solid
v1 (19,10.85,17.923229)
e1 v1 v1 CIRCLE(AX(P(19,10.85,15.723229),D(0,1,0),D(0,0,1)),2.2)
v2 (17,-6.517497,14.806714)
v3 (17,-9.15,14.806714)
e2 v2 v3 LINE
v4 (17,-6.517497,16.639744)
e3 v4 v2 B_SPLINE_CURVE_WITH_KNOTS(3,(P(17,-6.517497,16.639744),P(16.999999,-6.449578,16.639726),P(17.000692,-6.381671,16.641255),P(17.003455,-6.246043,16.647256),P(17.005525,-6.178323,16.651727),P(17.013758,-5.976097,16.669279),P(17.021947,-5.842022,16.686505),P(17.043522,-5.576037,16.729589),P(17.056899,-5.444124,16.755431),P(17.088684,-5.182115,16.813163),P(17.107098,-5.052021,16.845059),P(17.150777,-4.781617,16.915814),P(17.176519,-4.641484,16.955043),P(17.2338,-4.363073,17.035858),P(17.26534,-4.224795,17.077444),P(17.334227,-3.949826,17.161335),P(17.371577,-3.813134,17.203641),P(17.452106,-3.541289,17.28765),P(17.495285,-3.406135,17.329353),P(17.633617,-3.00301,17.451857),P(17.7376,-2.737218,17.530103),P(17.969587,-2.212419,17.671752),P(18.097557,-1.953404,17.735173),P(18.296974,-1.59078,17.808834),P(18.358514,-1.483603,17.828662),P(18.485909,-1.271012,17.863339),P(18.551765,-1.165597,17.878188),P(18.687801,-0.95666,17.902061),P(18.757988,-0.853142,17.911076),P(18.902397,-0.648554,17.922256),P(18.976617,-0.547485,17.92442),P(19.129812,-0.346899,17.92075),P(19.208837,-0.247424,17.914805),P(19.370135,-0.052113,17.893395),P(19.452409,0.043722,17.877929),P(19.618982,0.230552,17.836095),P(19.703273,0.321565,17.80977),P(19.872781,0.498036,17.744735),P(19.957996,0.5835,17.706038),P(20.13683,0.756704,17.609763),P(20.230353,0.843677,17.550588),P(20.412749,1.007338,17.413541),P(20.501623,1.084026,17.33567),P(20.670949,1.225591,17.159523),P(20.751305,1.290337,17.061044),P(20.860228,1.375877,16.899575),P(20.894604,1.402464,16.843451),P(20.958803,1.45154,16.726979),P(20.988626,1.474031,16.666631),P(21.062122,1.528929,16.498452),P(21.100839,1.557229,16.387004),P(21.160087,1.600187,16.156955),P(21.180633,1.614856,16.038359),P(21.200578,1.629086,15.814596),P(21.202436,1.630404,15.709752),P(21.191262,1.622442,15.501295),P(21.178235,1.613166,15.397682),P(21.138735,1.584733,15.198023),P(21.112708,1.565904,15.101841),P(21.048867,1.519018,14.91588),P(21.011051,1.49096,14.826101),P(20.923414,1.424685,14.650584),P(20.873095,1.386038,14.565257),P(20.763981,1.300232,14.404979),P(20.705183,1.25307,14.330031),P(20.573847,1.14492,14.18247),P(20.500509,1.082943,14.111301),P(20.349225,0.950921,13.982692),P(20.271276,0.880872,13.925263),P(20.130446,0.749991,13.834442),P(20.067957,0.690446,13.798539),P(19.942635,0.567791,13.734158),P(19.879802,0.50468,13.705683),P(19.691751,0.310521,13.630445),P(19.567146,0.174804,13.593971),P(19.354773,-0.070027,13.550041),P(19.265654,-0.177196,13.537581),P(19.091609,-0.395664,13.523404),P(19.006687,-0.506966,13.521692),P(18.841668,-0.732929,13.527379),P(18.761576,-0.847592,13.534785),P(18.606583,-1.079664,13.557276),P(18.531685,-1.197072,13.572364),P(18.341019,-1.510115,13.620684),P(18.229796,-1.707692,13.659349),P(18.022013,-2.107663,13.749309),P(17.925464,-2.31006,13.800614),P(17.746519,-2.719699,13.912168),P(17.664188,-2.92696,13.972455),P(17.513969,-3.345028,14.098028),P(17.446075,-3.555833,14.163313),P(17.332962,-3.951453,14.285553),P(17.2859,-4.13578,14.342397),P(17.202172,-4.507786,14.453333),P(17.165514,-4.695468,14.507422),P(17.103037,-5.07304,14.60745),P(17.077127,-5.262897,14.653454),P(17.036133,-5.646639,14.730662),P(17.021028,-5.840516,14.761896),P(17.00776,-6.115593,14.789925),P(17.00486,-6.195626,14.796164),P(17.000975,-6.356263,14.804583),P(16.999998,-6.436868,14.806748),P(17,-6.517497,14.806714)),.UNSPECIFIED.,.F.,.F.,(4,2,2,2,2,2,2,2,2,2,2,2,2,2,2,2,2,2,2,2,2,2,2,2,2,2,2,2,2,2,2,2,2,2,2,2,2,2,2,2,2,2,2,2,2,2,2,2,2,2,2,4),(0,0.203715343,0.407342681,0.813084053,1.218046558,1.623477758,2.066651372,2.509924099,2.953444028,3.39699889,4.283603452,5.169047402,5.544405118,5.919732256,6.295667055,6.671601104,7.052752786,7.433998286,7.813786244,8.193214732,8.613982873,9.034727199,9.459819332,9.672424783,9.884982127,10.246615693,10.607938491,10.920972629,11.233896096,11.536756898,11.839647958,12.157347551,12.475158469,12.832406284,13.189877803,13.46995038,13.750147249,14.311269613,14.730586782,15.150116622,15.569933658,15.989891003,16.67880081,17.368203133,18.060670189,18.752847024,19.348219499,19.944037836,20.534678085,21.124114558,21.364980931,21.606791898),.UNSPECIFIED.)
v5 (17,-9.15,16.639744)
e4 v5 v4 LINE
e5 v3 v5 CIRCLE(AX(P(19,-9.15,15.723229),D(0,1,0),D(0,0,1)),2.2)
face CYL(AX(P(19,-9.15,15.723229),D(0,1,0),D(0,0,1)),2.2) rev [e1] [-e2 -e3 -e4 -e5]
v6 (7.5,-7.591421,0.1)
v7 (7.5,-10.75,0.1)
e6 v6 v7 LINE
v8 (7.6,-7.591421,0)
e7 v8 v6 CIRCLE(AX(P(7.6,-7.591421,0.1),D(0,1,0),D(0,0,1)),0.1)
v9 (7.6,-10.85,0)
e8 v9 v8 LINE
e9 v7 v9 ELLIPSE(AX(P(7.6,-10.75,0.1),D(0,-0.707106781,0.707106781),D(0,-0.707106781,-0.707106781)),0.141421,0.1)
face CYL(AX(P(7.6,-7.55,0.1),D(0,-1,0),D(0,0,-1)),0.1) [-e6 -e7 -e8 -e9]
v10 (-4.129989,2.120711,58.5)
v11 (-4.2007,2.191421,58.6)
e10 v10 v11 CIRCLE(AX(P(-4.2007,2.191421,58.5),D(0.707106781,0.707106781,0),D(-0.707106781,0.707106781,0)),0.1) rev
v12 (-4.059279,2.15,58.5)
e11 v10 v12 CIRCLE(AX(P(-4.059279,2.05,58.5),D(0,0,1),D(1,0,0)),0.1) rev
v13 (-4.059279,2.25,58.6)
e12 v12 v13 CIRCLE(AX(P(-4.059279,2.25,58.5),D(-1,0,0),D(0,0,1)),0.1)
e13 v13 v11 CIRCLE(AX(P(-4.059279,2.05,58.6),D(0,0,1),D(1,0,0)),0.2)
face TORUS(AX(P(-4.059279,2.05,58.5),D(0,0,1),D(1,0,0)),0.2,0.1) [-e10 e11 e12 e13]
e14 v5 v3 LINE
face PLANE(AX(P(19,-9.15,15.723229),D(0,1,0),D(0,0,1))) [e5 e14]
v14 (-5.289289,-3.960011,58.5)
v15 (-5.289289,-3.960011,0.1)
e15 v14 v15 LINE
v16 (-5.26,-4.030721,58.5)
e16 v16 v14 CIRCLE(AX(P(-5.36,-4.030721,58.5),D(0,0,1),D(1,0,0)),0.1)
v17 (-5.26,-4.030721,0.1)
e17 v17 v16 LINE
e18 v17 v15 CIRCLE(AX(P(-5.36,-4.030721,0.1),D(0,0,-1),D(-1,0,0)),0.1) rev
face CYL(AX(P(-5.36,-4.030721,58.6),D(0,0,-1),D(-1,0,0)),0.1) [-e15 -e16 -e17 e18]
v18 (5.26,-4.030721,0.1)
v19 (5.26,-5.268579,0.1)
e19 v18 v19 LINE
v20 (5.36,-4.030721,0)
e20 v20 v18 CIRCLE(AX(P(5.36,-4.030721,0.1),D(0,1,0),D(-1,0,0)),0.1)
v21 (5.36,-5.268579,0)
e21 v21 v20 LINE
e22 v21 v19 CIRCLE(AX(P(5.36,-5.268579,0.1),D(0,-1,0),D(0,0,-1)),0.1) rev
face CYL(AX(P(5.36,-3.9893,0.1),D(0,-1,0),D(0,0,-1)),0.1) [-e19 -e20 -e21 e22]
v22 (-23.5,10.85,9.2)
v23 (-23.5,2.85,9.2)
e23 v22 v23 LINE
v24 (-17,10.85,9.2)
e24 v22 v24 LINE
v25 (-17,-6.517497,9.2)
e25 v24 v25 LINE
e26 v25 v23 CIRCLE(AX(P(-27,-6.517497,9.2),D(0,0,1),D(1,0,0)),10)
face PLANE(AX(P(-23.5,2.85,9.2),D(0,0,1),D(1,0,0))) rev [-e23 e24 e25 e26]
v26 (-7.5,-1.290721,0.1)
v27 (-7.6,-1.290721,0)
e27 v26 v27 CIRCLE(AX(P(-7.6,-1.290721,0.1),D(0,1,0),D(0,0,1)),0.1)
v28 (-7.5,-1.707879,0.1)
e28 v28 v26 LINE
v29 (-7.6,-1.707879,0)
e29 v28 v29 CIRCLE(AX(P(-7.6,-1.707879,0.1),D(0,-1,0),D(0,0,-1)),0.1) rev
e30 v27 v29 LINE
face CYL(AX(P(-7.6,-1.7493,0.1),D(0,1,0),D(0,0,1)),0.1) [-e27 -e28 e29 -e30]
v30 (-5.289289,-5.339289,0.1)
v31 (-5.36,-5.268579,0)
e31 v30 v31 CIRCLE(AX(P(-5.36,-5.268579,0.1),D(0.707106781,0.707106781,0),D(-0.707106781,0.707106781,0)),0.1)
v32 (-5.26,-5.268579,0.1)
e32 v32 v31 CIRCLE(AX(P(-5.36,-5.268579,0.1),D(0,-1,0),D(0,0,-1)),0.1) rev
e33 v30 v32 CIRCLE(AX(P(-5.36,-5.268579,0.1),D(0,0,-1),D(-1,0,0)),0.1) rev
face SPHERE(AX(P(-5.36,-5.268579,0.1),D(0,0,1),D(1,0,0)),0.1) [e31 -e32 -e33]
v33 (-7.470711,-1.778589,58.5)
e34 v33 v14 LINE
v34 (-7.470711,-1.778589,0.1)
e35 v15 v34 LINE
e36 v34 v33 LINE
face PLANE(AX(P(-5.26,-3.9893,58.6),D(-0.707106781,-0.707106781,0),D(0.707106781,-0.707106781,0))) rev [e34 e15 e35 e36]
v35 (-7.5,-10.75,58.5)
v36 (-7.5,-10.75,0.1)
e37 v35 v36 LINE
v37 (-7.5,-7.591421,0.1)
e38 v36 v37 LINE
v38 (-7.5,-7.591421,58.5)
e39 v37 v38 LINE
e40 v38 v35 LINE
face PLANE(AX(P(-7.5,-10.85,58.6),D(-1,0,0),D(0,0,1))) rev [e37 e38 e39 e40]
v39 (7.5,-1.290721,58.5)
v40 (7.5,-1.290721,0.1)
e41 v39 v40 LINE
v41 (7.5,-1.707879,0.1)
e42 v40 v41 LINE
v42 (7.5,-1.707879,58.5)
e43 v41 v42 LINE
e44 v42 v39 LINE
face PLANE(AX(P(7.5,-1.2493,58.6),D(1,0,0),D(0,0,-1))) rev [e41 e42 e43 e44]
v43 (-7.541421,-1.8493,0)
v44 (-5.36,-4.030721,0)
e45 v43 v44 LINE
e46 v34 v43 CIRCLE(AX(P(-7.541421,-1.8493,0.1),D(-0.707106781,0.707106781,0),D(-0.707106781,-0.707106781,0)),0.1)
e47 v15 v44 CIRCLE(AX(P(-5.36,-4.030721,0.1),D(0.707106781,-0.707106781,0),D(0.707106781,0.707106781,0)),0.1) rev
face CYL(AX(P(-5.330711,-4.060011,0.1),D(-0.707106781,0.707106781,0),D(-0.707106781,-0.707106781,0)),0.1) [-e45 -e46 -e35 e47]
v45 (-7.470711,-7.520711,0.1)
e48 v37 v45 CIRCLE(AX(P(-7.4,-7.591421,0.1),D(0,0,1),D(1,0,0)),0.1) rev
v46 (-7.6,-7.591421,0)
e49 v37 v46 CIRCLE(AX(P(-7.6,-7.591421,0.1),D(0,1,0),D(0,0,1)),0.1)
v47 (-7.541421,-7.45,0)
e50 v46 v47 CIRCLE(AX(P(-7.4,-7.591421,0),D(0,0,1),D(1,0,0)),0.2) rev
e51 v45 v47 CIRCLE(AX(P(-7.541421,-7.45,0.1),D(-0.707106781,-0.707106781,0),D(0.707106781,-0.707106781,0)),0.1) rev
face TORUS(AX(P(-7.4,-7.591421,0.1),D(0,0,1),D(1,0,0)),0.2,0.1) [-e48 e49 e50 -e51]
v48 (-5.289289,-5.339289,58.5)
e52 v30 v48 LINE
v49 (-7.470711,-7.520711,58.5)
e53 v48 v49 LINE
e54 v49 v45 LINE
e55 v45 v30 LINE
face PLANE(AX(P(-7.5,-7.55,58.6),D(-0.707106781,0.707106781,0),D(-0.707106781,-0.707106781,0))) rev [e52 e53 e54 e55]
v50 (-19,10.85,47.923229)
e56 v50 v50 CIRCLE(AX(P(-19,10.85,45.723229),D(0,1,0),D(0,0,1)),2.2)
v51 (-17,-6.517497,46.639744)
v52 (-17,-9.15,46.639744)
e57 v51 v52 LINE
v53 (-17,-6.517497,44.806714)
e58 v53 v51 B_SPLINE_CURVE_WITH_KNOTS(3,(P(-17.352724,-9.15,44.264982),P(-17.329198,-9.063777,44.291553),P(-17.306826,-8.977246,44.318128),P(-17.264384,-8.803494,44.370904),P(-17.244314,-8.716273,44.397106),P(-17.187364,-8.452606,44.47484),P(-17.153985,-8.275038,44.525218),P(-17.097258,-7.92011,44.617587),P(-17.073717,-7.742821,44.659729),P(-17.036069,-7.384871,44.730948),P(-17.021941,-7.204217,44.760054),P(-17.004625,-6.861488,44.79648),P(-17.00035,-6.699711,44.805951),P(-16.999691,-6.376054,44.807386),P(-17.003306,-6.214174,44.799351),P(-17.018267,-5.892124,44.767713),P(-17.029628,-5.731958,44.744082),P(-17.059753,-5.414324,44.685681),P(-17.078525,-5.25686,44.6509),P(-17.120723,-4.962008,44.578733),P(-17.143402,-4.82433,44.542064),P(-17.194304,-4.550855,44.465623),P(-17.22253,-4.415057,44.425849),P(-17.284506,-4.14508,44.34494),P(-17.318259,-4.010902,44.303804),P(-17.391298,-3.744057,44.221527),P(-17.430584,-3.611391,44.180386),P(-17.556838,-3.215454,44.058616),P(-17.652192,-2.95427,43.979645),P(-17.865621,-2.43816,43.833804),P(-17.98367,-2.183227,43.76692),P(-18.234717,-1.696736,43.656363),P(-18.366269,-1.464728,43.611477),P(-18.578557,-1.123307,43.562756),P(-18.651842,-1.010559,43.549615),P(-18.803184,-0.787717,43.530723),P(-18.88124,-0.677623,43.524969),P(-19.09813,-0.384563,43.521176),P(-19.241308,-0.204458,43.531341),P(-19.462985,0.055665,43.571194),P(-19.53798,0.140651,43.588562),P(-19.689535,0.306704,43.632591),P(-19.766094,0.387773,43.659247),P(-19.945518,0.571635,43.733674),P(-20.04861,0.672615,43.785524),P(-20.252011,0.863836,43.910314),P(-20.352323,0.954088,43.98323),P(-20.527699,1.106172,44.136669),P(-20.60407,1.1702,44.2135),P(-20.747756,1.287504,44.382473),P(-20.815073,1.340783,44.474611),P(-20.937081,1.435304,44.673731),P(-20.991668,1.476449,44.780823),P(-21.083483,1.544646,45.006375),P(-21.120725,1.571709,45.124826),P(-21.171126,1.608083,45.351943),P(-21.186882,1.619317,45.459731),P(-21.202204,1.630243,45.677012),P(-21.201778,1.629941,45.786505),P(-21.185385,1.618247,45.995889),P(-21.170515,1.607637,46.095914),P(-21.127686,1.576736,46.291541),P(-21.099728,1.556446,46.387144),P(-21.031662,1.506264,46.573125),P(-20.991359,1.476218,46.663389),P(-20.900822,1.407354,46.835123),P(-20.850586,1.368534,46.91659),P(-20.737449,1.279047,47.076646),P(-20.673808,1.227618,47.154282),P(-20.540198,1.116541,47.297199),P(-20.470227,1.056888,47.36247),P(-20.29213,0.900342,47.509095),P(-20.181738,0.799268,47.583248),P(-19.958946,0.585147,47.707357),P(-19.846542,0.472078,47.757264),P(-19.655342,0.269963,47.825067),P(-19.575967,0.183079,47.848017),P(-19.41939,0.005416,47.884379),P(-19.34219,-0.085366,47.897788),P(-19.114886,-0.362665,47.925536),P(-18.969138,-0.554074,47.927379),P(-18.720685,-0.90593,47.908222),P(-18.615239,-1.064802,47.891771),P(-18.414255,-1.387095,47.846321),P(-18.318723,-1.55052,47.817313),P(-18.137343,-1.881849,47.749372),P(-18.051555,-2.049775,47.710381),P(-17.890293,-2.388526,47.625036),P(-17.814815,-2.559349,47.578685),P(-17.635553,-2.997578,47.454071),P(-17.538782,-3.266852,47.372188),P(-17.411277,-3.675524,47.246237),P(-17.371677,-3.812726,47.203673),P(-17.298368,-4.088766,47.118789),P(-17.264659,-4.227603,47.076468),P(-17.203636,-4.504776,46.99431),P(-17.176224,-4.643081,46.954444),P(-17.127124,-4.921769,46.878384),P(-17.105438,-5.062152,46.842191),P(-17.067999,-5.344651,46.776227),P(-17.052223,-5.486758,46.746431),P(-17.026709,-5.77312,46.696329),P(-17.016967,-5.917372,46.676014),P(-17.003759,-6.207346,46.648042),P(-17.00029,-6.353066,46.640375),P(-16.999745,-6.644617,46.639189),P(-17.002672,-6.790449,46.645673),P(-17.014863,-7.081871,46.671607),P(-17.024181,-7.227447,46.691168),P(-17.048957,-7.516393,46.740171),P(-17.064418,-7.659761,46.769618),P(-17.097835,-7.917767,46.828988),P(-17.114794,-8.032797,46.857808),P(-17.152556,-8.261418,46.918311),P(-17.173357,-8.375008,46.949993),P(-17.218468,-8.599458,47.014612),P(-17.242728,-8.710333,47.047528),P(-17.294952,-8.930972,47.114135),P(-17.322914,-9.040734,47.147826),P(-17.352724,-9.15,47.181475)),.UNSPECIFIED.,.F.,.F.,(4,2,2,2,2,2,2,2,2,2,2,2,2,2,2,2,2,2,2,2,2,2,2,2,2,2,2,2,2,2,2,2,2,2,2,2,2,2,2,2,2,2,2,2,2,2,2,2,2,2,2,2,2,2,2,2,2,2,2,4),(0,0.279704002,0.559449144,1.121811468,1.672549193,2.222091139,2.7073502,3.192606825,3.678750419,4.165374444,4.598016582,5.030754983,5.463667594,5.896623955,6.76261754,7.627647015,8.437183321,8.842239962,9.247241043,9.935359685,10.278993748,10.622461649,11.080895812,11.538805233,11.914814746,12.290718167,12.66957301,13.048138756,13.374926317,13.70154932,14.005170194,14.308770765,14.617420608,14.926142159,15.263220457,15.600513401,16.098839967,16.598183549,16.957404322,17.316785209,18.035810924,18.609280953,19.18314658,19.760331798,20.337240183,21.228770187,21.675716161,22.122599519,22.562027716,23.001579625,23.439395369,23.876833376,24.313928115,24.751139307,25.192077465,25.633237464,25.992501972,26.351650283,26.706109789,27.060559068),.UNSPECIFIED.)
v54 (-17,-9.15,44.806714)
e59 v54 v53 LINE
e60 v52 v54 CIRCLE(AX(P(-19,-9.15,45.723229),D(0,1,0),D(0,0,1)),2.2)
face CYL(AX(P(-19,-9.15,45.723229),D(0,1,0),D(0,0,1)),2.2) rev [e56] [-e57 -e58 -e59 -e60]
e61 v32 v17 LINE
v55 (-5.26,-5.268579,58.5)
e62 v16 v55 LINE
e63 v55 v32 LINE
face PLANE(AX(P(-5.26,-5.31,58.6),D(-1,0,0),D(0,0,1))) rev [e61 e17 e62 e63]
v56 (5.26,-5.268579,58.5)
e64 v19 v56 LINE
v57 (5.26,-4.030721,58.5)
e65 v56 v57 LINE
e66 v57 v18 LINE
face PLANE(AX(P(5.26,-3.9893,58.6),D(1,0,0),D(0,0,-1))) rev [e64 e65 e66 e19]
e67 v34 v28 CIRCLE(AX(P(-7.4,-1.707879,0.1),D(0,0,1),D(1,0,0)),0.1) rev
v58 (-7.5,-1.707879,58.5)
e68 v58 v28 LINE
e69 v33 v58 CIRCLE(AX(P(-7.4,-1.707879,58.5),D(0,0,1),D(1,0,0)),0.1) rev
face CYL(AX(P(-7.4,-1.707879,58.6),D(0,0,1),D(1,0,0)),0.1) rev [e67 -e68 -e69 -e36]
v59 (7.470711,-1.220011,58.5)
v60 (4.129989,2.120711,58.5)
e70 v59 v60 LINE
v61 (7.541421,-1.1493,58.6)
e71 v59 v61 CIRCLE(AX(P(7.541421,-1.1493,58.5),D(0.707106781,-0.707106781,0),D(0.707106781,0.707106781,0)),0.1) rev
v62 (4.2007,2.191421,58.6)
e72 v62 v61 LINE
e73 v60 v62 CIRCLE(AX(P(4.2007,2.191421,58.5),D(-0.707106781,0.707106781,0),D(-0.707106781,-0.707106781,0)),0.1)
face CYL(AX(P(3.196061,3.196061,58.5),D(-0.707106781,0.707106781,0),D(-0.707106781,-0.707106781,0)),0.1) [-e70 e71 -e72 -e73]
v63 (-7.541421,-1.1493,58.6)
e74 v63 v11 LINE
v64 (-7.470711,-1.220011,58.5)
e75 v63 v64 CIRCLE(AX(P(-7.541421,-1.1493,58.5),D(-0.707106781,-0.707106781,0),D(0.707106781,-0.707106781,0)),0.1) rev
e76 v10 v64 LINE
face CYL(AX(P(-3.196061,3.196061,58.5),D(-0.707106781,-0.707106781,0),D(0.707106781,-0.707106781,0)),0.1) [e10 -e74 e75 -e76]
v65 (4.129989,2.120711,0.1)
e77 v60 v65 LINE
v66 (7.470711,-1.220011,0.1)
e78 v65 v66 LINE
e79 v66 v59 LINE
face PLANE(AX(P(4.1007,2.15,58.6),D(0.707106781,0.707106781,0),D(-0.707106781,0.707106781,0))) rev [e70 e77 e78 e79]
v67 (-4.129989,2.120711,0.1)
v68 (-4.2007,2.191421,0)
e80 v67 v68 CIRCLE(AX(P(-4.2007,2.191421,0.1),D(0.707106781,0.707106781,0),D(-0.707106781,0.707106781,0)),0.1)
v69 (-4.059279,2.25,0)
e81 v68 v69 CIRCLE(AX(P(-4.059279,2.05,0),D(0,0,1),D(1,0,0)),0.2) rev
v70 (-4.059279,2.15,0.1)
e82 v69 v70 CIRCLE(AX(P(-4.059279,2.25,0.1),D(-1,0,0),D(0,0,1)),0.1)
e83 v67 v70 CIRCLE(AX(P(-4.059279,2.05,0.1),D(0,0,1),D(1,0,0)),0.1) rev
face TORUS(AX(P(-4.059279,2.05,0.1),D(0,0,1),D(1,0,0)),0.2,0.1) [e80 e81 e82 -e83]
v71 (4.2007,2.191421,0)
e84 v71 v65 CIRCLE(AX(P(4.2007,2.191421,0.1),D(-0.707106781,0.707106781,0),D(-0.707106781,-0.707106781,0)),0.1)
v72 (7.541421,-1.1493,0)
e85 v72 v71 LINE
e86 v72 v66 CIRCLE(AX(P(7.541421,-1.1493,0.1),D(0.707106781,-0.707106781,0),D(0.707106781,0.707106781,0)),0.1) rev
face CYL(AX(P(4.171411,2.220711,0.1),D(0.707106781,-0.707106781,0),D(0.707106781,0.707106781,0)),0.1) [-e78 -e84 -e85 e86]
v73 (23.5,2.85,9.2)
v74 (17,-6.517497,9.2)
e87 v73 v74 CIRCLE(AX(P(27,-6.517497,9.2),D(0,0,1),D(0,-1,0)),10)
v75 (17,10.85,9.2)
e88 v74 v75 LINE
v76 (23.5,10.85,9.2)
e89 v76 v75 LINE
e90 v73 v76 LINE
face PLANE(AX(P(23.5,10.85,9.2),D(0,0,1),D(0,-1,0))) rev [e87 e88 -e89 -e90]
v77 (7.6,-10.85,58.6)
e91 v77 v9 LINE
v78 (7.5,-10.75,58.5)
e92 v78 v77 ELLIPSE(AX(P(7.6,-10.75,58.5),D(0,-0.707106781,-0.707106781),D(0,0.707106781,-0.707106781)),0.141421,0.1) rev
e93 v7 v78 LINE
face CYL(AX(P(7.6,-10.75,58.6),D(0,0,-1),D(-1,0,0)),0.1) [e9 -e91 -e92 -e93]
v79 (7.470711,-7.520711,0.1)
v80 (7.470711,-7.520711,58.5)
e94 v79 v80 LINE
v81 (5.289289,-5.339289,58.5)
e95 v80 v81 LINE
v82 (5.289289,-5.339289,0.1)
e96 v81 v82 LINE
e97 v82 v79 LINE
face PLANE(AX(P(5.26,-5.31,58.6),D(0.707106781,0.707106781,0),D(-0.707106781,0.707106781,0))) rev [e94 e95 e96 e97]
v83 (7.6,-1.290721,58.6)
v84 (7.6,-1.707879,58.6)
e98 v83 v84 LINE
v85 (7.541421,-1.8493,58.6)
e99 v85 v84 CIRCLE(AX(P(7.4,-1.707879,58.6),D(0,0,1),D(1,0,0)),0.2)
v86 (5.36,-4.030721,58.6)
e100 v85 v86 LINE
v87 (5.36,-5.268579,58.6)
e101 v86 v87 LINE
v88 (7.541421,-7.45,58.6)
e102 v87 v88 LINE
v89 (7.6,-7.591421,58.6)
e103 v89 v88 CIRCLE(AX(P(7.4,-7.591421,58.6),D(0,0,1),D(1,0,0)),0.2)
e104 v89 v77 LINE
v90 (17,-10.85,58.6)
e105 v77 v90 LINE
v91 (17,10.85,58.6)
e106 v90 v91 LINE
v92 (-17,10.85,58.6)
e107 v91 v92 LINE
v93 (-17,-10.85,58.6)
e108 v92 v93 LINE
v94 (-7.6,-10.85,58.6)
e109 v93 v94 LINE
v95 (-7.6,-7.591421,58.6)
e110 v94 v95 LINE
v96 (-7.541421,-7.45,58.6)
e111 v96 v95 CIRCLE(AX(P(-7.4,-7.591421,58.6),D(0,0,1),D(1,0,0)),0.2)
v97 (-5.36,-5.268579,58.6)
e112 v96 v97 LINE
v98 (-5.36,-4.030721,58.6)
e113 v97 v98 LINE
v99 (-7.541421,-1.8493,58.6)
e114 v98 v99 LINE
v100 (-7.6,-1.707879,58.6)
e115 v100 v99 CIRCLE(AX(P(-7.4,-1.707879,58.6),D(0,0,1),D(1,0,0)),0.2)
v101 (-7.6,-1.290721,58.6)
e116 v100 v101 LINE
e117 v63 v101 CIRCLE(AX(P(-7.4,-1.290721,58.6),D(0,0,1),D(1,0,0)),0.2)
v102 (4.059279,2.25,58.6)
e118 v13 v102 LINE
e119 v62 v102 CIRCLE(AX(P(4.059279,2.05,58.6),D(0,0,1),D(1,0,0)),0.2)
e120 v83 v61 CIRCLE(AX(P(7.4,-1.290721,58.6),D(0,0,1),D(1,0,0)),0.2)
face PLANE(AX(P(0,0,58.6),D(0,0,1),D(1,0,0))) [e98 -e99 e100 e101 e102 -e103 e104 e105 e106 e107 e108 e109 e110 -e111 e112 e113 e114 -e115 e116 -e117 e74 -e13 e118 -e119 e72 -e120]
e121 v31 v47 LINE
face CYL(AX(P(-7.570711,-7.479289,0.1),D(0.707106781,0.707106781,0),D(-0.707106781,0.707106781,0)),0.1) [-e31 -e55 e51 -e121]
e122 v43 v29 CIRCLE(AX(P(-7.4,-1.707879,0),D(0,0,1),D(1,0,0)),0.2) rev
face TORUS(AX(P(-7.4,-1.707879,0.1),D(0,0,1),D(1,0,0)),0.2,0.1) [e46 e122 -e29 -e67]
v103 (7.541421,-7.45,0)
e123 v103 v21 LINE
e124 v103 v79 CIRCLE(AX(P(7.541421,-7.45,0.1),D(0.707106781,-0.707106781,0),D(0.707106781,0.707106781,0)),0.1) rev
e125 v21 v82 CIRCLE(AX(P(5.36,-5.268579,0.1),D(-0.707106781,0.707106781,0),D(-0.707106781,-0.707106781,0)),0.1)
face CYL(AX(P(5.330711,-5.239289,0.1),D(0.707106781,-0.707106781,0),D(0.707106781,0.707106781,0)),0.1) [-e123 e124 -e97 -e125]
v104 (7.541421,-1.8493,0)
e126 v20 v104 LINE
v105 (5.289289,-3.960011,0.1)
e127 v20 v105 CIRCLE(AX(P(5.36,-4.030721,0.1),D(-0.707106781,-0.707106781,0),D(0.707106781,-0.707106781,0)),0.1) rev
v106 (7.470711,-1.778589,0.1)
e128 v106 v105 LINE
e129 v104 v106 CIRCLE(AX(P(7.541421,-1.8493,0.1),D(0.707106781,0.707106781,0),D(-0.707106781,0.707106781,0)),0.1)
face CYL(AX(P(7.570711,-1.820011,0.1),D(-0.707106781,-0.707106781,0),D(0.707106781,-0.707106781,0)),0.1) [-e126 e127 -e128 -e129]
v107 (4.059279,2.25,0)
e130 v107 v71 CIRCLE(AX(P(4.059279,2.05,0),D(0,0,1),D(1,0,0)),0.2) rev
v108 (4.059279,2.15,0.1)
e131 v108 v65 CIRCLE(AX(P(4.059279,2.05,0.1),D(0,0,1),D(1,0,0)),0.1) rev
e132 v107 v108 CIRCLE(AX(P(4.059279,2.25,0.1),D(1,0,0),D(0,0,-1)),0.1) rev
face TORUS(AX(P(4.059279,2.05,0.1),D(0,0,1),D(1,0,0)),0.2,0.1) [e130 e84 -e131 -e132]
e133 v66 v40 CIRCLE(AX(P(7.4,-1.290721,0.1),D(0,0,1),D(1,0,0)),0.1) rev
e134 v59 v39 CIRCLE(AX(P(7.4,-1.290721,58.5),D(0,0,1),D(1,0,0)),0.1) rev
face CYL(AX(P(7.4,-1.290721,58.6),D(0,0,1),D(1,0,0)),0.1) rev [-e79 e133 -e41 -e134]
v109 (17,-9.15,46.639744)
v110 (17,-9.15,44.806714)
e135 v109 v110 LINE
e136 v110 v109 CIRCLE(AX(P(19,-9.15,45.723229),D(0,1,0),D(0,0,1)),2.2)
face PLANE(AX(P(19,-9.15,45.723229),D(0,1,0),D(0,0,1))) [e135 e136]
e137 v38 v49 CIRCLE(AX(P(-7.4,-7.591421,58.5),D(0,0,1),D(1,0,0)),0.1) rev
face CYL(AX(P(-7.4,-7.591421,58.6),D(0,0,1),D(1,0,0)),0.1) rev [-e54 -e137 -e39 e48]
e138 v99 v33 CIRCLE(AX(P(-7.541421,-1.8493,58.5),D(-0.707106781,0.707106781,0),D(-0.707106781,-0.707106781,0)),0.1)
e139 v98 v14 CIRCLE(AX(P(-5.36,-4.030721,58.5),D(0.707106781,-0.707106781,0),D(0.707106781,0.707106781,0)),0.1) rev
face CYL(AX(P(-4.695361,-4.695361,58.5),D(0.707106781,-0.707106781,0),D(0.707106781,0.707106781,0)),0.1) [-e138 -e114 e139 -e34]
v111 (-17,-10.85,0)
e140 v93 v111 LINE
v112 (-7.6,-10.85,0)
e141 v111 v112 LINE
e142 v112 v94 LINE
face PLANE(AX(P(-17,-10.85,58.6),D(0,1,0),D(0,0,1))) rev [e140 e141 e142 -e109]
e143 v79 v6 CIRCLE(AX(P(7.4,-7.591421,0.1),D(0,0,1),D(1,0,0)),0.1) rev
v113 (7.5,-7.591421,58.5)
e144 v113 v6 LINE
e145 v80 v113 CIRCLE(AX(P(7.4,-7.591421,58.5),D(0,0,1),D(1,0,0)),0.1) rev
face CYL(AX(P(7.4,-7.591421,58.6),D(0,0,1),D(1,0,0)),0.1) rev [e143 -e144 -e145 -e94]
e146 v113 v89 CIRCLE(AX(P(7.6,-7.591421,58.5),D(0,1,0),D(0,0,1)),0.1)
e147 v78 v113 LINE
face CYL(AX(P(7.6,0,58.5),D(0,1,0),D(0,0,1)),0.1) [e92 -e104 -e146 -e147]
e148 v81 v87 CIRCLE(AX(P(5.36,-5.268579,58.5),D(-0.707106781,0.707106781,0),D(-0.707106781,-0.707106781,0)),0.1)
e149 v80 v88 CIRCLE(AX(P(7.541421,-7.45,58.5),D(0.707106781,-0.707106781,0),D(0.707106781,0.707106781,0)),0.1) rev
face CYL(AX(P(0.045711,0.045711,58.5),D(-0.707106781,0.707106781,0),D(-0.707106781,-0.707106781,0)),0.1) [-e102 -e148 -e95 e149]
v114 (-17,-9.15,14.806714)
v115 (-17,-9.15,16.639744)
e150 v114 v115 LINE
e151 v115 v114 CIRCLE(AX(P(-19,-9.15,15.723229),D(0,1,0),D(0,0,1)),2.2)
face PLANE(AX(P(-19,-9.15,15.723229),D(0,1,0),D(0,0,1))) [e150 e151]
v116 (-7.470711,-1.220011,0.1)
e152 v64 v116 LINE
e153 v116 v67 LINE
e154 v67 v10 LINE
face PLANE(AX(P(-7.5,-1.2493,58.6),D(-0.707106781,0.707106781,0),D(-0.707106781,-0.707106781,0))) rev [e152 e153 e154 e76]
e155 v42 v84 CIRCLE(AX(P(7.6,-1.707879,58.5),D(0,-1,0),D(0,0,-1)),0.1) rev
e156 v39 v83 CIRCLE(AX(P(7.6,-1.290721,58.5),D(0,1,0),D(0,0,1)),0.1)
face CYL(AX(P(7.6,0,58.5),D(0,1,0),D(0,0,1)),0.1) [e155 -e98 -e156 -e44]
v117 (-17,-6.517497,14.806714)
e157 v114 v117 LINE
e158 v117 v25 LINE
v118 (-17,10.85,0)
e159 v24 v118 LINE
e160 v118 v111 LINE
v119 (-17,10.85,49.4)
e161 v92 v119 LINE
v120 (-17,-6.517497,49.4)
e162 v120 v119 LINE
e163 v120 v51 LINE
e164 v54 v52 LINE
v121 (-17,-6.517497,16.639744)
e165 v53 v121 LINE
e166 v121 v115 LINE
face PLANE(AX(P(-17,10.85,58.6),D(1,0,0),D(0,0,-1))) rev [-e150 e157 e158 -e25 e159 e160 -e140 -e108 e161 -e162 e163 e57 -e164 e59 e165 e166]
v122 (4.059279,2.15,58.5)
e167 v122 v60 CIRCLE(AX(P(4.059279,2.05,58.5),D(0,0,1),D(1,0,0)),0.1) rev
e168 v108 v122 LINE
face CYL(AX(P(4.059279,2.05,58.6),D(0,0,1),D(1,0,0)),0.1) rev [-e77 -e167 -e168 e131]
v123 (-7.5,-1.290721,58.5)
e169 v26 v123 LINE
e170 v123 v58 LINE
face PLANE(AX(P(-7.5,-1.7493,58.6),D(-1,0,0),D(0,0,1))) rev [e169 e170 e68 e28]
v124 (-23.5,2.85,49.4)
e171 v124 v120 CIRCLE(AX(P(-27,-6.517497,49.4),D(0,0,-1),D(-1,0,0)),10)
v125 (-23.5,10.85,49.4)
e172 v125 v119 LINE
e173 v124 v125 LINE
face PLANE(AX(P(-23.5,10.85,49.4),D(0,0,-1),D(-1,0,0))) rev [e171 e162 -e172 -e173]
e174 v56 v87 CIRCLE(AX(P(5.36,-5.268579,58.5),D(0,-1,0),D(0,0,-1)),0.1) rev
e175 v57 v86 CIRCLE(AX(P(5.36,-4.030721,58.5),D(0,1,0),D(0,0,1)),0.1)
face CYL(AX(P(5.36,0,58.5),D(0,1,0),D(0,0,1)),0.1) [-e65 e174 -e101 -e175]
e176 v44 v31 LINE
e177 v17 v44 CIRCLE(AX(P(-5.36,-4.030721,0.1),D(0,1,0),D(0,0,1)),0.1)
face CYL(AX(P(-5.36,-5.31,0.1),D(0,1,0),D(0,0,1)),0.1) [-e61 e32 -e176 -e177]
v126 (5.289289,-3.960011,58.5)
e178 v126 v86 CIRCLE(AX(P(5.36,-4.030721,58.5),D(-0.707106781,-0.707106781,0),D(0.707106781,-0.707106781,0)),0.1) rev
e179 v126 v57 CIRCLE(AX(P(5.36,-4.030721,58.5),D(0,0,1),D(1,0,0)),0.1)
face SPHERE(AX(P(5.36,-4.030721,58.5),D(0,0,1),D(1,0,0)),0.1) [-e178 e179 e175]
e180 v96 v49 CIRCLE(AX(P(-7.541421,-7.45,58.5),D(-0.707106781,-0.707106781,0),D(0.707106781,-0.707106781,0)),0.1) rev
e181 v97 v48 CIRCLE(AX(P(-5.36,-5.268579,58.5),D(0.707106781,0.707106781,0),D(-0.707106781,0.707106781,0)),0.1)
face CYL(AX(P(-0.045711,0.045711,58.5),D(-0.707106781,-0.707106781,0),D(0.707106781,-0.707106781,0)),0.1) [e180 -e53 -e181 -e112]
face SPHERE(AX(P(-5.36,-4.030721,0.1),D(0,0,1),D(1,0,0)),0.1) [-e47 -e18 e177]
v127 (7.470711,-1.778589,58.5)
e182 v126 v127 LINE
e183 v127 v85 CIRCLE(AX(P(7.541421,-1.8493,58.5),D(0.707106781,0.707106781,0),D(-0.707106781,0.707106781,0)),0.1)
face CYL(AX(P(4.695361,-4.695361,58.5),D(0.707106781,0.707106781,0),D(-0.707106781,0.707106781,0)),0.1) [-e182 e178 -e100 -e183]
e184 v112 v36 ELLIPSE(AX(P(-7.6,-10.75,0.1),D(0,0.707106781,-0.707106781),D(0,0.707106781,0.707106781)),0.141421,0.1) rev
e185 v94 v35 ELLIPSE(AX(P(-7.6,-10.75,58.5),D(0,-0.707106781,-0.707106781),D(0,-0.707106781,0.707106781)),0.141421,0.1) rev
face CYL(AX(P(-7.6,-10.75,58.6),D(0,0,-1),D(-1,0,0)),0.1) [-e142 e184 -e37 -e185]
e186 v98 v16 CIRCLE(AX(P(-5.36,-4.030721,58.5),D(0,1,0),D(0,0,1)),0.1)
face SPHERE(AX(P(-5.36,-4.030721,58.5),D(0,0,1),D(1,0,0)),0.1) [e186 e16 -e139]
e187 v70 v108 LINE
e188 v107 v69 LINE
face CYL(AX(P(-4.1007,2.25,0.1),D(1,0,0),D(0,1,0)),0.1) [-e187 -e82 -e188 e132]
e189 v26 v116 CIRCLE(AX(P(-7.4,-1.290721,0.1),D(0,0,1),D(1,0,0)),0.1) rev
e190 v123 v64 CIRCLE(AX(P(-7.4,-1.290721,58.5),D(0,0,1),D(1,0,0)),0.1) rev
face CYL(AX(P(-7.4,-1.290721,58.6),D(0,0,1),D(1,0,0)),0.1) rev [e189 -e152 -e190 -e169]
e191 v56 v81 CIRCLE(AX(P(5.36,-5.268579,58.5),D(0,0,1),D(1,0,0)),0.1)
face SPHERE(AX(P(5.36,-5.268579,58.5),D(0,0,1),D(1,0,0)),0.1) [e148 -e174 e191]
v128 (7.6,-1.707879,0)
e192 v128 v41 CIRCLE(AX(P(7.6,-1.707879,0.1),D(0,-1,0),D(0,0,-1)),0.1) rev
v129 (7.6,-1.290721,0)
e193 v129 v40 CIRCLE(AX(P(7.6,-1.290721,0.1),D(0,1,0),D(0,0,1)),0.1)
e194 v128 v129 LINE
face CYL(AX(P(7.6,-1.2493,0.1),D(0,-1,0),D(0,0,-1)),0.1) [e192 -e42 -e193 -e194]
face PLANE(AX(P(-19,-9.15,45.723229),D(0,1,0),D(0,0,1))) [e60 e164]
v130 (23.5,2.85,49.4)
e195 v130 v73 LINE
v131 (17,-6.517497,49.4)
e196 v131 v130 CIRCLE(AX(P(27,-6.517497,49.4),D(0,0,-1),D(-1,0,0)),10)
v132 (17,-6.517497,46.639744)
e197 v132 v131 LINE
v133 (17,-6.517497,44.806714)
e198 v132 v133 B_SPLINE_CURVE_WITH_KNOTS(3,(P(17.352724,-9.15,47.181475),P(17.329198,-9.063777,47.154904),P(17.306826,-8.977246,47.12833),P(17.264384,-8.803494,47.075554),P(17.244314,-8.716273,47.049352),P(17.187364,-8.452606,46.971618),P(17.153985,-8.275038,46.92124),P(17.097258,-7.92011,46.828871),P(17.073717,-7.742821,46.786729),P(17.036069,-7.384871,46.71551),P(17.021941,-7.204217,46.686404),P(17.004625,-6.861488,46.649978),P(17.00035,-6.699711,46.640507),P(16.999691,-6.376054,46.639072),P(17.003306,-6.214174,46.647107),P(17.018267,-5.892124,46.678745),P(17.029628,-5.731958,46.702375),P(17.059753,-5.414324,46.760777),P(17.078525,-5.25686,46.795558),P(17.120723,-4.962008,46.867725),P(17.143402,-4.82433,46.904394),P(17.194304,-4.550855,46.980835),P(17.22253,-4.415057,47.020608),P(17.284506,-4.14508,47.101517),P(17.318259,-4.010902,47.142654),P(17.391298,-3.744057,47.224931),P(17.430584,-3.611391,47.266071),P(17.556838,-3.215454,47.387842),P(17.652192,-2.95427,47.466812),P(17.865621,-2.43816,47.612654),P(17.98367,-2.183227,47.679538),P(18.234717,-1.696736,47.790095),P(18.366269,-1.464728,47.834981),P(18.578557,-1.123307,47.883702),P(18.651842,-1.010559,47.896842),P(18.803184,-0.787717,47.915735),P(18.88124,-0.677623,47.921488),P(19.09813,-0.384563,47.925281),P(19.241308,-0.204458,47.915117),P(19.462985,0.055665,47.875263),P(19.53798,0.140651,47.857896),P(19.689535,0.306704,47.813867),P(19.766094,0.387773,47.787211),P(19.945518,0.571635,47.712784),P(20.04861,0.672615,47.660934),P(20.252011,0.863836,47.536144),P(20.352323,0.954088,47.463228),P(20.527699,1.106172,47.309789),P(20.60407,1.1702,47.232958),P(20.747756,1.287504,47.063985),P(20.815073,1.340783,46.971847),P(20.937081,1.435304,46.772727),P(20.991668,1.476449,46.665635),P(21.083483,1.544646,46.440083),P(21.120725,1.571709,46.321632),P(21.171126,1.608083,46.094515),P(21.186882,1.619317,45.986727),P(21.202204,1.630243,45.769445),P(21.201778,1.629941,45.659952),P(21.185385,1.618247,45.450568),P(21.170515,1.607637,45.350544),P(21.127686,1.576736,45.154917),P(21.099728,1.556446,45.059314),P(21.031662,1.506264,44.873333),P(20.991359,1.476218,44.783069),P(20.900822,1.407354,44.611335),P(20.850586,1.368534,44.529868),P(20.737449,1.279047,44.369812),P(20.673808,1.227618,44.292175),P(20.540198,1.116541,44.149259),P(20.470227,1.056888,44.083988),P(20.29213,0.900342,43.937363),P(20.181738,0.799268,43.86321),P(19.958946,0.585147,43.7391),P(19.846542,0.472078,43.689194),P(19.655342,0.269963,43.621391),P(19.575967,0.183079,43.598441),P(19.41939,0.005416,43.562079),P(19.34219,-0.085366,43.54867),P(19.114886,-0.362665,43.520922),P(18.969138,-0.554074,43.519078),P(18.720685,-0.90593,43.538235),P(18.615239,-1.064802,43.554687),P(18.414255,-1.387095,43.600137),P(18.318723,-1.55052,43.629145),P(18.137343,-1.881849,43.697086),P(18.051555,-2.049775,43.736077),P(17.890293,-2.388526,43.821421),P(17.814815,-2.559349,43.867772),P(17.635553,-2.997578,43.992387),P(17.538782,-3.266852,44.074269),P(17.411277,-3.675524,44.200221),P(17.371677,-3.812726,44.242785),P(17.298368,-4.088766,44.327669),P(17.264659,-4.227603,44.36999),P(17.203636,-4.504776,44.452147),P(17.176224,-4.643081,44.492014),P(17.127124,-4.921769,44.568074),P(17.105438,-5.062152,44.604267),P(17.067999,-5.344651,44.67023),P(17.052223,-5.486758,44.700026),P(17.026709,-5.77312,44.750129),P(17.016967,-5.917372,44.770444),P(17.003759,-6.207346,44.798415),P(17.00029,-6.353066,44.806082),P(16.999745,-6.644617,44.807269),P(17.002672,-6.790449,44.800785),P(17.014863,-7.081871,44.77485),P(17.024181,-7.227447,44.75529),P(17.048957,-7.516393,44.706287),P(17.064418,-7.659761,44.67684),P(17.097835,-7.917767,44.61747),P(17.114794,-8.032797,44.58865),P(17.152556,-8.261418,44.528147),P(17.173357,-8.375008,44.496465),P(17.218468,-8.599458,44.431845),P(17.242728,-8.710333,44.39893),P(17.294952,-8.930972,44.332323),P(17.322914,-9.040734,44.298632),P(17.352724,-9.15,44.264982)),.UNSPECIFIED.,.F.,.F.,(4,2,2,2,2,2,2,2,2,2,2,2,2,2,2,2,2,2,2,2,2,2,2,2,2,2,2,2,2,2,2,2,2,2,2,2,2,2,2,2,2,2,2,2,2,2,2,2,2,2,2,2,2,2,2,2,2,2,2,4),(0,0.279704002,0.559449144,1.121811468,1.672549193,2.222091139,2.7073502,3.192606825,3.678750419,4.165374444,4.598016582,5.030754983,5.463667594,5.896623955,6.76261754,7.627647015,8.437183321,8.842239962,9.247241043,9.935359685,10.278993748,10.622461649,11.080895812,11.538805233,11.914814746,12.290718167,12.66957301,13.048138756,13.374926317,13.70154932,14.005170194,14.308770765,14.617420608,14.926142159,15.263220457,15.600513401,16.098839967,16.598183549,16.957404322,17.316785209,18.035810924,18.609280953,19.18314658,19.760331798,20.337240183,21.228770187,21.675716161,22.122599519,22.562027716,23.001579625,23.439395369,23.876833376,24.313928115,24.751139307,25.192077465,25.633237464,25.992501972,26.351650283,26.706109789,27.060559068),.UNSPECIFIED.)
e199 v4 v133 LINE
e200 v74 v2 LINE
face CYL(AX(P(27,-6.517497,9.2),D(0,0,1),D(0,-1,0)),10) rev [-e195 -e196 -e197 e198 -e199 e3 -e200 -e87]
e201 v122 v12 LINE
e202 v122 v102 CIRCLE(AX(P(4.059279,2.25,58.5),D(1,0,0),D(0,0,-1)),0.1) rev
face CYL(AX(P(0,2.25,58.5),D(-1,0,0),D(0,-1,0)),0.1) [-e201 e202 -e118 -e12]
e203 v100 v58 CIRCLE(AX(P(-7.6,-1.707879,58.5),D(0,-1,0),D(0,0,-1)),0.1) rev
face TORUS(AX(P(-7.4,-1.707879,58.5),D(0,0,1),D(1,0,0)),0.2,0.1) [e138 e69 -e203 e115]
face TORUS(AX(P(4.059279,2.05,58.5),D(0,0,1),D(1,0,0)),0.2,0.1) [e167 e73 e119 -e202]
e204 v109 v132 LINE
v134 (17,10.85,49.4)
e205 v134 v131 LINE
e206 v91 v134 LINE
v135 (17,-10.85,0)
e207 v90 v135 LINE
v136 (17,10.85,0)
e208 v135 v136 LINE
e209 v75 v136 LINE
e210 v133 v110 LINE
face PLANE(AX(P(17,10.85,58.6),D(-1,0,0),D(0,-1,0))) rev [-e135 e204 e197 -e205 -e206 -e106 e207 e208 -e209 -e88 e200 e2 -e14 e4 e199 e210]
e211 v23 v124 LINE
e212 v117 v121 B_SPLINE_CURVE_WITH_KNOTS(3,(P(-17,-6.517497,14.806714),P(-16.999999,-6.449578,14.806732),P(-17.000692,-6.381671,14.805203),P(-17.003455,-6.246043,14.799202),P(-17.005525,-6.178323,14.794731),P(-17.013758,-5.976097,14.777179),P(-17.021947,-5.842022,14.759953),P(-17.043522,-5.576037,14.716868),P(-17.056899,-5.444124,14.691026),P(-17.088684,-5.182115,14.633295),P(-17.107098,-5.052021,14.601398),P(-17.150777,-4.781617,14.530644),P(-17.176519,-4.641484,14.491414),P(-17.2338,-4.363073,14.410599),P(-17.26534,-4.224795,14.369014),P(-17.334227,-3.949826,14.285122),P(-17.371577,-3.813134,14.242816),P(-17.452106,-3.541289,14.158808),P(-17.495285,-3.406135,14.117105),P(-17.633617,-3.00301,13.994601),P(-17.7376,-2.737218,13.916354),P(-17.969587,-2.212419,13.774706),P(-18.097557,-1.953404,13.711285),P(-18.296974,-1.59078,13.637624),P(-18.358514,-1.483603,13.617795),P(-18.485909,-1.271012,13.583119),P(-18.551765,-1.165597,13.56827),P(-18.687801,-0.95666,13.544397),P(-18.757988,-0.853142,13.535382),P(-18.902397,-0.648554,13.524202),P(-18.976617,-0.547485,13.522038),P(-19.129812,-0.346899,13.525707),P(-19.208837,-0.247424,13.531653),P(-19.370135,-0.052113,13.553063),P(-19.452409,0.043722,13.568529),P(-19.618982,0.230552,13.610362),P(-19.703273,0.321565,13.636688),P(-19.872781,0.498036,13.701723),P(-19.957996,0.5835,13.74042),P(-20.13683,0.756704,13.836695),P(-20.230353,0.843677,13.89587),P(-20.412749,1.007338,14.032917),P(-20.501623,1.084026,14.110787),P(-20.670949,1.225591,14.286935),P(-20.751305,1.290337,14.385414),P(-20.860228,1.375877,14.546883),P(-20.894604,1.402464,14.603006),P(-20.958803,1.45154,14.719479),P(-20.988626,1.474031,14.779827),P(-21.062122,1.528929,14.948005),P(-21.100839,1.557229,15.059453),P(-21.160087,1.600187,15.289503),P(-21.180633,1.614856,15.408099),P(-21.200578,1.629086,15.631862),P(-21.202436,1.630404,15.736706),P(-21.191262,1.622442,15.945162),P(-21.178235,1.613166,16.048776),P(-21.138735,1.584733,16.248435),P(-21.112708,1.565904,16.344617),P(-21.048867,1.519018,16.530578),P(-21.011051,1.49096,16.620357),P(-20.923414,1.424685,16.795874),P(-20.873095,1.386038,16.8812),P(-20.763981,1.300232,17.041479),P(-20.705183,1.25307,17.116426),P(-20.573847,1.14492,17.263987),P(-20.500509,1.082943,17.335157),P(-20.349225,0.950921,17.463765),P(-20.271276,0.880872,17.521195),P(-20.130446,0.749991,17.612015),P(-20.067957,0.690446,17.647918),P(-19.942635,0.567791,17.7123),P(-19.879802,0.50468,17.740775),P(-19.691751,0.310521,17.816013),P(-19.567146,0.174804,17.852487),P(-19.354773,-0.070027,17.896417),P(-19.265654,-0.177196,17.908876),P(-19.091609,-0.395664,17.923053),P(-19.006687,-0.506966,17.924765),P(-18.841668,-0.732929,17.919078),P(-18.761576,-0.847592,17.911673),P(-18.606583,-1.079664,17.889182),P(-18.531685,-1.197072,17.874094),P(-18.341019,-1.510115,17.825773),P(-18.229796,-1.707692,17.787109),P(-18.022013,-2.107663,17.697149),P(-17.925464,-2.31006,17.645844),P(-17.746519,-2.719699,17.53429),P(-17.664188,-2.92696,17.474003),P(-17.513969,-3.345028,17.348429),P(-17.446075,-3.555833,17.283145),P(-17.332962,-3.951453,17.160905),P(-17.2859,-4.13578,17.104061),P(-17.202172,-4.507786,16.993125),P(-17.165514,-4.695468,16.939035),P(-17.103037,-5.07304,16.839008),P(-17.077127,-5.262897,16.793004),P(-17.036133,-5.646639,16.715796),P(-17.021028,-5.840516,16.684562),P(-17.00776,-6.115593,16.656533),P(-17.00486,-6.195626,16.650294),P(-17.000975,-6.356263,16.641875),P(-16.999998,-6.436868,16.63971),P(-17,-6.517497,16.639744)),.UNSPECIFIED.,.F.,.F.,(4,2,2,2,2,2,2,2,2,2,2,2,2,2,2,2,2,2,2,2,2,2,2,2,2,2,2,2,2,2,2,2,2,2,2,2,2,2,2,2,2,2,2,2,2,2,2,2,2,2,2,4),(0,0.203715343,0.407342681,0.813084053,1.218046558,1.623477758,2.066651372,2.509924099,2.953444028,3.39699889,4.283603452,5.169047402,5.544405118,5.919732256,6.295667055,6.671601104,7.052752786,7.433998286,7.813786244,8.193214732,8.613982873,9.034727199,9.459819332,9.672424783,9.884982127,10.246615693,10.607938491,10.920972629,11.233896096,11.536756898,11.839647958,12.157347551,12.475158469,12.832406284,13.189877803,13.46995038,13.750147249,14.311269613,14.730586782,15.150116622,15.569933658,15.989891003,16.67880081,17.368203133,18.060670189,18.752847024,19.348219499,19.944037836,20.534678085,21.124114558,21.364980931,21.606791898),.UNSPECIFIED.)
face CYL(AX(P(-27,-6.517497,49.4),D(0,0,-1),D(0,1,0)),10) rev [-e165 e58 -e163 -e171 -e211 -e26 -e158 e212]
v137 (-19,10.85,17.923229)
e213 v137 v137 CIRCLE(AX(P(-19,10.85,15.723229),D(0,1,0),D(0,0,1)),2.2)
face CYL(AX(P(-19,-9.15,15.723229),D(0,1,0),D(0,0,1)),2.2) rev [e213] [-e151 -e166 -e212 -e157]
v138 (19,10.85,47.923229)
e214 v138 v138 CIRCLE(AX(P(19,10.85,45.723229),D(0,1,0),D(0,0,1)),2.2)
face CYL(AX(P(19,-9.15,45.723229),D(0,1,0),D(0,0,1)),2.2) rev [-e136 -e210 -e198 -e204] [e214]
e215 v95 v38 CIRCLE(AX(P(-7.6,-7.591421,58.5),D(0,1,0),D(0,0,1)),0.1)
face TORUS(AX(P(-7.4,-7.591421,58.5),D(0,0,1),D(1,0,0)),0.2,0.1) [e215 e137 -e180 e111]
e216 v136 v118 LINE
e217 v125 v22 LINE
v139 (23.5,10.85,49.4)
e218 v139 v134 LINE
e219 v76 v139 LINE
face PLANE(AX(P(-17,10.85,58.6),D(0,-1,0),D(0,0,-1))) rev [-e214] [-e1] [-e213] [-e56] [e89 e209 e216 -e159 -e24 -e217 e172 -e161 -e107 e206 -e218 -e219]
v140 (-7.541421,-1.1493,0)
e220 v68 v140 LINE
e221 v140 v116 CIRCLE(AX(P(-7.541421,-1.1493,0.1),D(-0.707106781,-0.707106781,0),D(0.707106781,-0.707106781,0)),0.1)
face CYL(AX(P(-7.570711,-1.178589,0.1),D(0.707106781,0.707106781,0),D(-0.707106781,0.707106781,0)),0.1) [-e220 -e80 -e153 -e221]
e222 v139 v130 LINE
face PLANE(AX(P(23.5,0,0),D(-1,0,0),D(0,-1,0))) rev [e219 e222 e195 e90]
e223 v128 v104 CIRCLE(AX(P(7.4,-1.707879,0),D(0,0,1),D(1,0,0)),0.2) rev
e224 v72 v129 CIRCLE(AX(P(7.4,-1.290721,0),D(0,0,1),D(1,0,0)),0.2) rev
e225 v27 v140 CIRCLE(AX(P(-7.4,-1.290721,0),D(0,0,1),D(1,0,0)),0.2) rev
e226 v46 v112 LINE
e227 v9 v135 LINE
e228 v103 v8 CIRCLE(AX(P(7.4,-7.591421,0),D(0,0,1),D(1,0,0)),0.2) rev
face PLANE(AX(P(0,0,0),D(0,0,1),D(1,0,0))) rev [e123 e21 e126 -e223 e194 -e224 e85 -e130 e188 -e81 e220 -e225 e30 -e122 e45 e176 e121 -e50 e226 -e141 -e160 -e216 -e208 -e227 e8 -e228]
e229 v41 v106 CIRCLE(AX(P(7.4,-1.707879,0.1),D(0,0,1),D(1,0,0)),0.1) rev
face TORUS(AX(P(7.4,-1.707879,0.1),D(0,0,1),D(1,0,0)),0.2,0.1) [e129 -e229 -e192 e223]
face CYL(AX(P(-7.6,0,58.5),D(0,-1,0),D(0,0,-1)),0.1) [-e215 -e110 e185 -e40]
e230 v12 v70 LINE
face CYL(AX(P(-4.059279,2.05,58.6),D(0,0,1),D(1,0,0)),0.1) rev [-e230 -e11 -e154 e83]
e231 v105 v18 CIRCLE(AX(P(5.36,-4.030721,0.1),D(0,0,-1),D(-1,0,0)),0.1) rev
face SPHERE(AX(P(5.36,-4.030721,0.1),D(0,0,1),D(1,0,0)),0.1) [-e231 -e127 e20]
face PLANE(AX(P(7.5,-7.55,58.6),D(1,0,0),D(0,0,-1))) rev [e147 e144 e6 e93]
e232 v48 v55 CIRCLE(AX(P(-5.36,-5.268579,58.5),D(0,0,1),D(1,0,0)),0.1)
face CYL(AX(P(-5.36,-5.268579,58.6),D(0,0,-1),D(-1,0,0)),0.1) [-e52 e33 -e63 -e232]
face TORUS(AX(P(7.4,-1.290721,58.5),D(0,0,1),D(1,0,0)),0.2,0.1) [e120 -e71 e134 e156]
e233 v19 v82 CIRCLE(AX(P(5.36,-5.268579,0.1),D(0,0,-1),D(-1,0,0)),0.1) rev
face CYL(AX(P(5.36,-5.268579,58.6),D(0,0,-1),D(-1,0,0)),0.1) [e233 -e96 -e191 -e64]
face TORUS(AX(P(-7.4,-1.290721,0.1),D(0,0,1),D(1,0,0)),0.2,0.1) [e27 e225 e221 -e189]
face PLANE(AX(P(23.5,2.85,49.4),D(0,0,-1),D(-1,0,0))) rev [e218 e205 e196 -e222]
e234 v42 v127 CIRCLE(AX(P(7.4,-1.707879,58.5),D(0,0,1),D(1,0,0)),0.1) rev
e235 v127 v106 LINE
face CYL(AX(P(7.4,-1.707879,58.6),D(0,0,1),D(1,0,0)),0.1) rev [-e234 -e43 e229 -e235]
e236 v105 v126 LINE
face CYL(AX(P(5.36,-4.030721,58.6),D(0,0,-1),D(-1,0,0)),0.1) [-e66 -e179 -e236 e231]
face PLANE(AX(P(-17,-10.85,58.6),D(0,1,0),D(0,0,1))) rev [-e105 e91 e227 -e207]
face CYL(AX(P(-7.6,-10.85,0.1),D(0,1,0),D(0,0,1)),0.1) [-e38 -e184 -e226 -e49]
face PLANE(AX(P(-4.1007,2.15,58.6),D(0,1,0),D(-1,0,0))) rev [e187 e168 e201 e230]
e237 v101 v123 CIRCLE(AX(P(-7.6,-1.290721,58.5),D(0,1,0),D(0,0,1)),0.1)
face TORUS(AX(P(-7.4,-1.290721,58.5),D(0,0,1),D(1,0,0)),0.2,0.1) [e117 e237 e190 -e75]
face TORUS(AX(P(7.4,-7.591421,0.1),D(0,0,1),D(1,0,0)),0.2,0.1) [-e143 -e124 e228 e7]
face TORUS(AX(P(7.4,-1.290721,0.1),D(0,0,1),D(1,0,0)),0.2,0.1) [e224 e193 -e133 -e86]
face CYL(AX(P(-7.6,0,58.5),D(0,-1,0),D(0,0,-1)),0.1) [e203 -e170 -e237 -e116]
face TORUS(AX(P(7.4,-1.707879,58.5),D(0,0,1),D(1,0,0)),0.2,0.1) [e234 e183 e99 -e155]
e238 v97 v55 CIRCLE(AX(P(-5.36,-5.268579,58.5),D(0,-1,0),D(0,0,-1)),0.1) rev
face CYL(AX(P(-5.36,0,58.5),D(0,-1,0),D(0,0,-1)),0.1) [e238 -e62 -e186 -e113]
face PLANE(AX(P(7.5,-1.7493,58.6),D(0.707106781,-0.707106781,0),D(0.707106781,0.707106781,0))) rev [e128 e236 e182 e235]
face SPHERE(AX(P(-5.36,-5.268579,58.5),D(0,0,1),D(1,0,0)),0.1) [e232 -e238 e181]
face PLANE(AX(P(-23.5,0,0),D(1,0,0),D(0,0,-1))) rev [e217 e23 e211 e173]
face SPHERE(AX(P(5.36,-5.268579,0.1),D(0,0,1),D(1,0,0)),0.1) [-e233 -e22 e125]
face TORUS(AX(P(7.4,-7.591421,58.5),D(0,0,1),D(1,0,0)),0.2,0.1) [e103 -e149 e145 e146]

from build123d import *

# Parameters (mm, degrees)
SKETCH_4_W          = 34
SKETCH_4_H          = 21.7
EXTRUDE_2_DEPTH     = 58.6
CUT_EXTRUDE_1_DEPTH = 58.6
FILLET_1_R          = 0.1
EXTRUDE_4_DEPTH     = 6.5
EXTRUDE_5_DEPTH     = 6.5
FILLET_3_R          = 10
FILLET_4_R          = 10
SKETCH_11_R         = 2.2
CUT_EXTRUDE_2_DEPTH = 20


with BuildPart() as part:
    # Эскиз4 → Бобышка-Вытянуть2 (new body)
    with BuildSketch(Plane.XY):
        Rectangle(SKETCH_4_W, SKETCH_4_H)
    extrude(amount=EXTRUDE_2_DEPTH)

    # Эскиз5 → Вырез-Вытянуть1 (cut)
    with BuildSketch(Plane(origin=(0, 0, 0), x_dir=(-1, 0, 0), z_dir=(0, 0, -1))):
        Polygon((0, -10.85), (7.5, -10.85), (7.5, -7.55), (5.26, -5.31), (5.26, -3.989299906), (7.5, -1.749299906), (7.5, -1.249299906), (4.100700094, 2.15), (-4.100700094, 2.15), (-7.5, -1.249299906), (-7.5, -1.749299906), (-5.26, -3.989299906), (-5.26, -5.31), (-7.5, -7.55), (-7.5, -10.85), align=None)
    extrude(amount=-CUT_EXTRUDE_1_DEPTH, mode=Mode.SUBTRACT)

    # Скругление1
    fillet_1_edges = [part.edges().sort_by_distance(p)[0] for p in [
        (7.5, -9.2, 58.6),
        (7.5, -10.85, 29.3),
        (6.38, -6.43, 58.6),
        (7.5, -7.55, 29.3),
        (5.26, -4.649649953, 58.6),
        (5.26, -5.31, 29.3),
        (6.38, -2.869299906, 58.6),
        (5.26, -3.989299906, 29.3),
        (7.5, -1.499299906, 58.6),
        (7.5, -1.749299906, 29.3),
        (5.800350047, 0.450350047, 58.6),
        (7.5, -1.249299906, 29.3),
        (0, 2.15, 58.6),
        (4.100700094, 2.15, 29.3),
        (-5.800350047, 0.450350047, 58.6),
        (-4.100700094, 2.15, 29.3),
        (-7.5, -1.499299906, 58.6),
        (-7.5, -1.249299906, 29.3),
        (-6.38, -2.869299906, 58.6),
        (-7.5, -1.749299906, 29.3),
        (-5.26, -4.649649953, 58.6),
        (-5.26, -3.989299906, 29.3),
        (-6.38, -6.43, 58.6),
        (-5.26, -5.31, 29.3),
        (-7.5, -9.2, 58.6),
        (-7.5, -7.55, 29.3),
        (-7.5, -10.85, 29.3),
        (7.5, -9.2, 0),
        (-7.5, -9.2, 0),
        (-6.38, -6.43, 0),
        (-5.26, -4.649649953, 0),
        (-6.38, -2.869299906, 0),
        (-7.5, -1.499299906, 0),
        (-5.800350047, 0.450350047, 0),
        (0, 2.15, 0),
        (5.800350047, 0.450350047, 0),
        (7.5, -1.499299906, 0),
        (6.38, -2.869299906, 0),
        (5.26, -4.649649953, 0),
        (6.38, -6.43, 0),
    ]]
    fillet(fillet_1_edges, radius=FILLET_1_R)

    # Эскиз9 → Бобышка-Вытянуть4 (add)
    with BuildSketch(Plane(origin=(17, 0, 0), x_dir=(0, 0, -1), z_dir=(1, 0, 0))):
        Polygon((-29.3, 10.85), (-9.2, 10.85), (-9.2, 2.85), (-49.4, 2.85), (-49.4, 10.85), align=None)
    extrude(amount=EXTRUDE_4_DEPTH)

    # Эскиз10 → Бобышка-Вытянуть5 (add)
    with BuildSketch(Plane.ZY.offset(17)):
        Polygon((29.3, 10.85), (49.4, 10.85), (49.4, 2.85), (9.2, 2.85), (9.2, 10.85), align=None)
    extrude(amount=EXTRUDE_5_DEPTH)

    # Скругление3
    # the kernel refuses this fillet: 10 mm, written as the material it adds along each edge
    with BuildSketch(Plane(origin=(-17, 2.85, 49.4), x_dir=(0, -1, 0), z_dir=(0, 0, -1))) as fillet_3_piece_1:
        with BuildLine():
            CenterArc((9.367496998, 10), FILLET_3_R, 200.487315115, 69.512684885)
            Line((0, 6.5), (-0.18734994, 6.43))
            ThreePointArc((-0.18734994, 6.43), (-0.2, 3.25), (-0.2, 0))
            Line((-0.2, 0), (0, -0.2))
            Line((0, -0.2), (9.367496998, -0.2))
            Line((9.367496998, -0.2), (9.367496998, 0))
        make_face()
    extrude(amount=40.2)

    # Скругление4
    # the kernel refuses this fillet: 10 mm, written as the material it adds along each edge
    with BuildSketch(Plane(origin=(17, 2.85, 9.2), x_dir=(1, 0, 0), z_dir=(0, 0, 1))) as fillet_4_piece_1:
        with BuildLine():
            CenterArc((10, -9.367496998), FILLET_4_R, 110.487315115, 69.512684885)
            Line((0, -9.367496998), (-0.2, -9.367496998))
            Line((-0.2, -9.367496998), (-0.2, 0))
            Line((-0.2, 0), (0, 0.2))
            ThreePointArc((0, 0.2), (3.25, 0.2), (6.43, 0.18734994))
            Line((6.43, 0.18734994), (6.5, 0))
        make_face()
    extrude(amount=40.2)

    # Эскиз11 → Вырез-Вытянуть2 (cut)
    with BuildSketch(Plane(origin=(0, 10.85, 0), x_dir=(1, 0, 0), z_dir=(0, 1, 0))):
        with Locations(Location((-19, -15.723228877, 0), (0, 0, 270))):
            Circle(SKETCH_11_R)
        with Locations(Location((19, -15.723228877, 0), (0, 0, 270))):
            Circle(SKETCH_11_R)
        with Locations(Location((-19, -45.723228877, 0), (0, 0, 270))):
            Circle(SKETCH_11_R)
        with Locations(Location((19, -45.723228877, 0), (0, 0, 270))):
            Circle(SKETCH_11_R)
    extrude(amount=-CUT_EXTRUDE_2_DEPTH, mode=Mode.SUBTRACT)


solid = part.part
